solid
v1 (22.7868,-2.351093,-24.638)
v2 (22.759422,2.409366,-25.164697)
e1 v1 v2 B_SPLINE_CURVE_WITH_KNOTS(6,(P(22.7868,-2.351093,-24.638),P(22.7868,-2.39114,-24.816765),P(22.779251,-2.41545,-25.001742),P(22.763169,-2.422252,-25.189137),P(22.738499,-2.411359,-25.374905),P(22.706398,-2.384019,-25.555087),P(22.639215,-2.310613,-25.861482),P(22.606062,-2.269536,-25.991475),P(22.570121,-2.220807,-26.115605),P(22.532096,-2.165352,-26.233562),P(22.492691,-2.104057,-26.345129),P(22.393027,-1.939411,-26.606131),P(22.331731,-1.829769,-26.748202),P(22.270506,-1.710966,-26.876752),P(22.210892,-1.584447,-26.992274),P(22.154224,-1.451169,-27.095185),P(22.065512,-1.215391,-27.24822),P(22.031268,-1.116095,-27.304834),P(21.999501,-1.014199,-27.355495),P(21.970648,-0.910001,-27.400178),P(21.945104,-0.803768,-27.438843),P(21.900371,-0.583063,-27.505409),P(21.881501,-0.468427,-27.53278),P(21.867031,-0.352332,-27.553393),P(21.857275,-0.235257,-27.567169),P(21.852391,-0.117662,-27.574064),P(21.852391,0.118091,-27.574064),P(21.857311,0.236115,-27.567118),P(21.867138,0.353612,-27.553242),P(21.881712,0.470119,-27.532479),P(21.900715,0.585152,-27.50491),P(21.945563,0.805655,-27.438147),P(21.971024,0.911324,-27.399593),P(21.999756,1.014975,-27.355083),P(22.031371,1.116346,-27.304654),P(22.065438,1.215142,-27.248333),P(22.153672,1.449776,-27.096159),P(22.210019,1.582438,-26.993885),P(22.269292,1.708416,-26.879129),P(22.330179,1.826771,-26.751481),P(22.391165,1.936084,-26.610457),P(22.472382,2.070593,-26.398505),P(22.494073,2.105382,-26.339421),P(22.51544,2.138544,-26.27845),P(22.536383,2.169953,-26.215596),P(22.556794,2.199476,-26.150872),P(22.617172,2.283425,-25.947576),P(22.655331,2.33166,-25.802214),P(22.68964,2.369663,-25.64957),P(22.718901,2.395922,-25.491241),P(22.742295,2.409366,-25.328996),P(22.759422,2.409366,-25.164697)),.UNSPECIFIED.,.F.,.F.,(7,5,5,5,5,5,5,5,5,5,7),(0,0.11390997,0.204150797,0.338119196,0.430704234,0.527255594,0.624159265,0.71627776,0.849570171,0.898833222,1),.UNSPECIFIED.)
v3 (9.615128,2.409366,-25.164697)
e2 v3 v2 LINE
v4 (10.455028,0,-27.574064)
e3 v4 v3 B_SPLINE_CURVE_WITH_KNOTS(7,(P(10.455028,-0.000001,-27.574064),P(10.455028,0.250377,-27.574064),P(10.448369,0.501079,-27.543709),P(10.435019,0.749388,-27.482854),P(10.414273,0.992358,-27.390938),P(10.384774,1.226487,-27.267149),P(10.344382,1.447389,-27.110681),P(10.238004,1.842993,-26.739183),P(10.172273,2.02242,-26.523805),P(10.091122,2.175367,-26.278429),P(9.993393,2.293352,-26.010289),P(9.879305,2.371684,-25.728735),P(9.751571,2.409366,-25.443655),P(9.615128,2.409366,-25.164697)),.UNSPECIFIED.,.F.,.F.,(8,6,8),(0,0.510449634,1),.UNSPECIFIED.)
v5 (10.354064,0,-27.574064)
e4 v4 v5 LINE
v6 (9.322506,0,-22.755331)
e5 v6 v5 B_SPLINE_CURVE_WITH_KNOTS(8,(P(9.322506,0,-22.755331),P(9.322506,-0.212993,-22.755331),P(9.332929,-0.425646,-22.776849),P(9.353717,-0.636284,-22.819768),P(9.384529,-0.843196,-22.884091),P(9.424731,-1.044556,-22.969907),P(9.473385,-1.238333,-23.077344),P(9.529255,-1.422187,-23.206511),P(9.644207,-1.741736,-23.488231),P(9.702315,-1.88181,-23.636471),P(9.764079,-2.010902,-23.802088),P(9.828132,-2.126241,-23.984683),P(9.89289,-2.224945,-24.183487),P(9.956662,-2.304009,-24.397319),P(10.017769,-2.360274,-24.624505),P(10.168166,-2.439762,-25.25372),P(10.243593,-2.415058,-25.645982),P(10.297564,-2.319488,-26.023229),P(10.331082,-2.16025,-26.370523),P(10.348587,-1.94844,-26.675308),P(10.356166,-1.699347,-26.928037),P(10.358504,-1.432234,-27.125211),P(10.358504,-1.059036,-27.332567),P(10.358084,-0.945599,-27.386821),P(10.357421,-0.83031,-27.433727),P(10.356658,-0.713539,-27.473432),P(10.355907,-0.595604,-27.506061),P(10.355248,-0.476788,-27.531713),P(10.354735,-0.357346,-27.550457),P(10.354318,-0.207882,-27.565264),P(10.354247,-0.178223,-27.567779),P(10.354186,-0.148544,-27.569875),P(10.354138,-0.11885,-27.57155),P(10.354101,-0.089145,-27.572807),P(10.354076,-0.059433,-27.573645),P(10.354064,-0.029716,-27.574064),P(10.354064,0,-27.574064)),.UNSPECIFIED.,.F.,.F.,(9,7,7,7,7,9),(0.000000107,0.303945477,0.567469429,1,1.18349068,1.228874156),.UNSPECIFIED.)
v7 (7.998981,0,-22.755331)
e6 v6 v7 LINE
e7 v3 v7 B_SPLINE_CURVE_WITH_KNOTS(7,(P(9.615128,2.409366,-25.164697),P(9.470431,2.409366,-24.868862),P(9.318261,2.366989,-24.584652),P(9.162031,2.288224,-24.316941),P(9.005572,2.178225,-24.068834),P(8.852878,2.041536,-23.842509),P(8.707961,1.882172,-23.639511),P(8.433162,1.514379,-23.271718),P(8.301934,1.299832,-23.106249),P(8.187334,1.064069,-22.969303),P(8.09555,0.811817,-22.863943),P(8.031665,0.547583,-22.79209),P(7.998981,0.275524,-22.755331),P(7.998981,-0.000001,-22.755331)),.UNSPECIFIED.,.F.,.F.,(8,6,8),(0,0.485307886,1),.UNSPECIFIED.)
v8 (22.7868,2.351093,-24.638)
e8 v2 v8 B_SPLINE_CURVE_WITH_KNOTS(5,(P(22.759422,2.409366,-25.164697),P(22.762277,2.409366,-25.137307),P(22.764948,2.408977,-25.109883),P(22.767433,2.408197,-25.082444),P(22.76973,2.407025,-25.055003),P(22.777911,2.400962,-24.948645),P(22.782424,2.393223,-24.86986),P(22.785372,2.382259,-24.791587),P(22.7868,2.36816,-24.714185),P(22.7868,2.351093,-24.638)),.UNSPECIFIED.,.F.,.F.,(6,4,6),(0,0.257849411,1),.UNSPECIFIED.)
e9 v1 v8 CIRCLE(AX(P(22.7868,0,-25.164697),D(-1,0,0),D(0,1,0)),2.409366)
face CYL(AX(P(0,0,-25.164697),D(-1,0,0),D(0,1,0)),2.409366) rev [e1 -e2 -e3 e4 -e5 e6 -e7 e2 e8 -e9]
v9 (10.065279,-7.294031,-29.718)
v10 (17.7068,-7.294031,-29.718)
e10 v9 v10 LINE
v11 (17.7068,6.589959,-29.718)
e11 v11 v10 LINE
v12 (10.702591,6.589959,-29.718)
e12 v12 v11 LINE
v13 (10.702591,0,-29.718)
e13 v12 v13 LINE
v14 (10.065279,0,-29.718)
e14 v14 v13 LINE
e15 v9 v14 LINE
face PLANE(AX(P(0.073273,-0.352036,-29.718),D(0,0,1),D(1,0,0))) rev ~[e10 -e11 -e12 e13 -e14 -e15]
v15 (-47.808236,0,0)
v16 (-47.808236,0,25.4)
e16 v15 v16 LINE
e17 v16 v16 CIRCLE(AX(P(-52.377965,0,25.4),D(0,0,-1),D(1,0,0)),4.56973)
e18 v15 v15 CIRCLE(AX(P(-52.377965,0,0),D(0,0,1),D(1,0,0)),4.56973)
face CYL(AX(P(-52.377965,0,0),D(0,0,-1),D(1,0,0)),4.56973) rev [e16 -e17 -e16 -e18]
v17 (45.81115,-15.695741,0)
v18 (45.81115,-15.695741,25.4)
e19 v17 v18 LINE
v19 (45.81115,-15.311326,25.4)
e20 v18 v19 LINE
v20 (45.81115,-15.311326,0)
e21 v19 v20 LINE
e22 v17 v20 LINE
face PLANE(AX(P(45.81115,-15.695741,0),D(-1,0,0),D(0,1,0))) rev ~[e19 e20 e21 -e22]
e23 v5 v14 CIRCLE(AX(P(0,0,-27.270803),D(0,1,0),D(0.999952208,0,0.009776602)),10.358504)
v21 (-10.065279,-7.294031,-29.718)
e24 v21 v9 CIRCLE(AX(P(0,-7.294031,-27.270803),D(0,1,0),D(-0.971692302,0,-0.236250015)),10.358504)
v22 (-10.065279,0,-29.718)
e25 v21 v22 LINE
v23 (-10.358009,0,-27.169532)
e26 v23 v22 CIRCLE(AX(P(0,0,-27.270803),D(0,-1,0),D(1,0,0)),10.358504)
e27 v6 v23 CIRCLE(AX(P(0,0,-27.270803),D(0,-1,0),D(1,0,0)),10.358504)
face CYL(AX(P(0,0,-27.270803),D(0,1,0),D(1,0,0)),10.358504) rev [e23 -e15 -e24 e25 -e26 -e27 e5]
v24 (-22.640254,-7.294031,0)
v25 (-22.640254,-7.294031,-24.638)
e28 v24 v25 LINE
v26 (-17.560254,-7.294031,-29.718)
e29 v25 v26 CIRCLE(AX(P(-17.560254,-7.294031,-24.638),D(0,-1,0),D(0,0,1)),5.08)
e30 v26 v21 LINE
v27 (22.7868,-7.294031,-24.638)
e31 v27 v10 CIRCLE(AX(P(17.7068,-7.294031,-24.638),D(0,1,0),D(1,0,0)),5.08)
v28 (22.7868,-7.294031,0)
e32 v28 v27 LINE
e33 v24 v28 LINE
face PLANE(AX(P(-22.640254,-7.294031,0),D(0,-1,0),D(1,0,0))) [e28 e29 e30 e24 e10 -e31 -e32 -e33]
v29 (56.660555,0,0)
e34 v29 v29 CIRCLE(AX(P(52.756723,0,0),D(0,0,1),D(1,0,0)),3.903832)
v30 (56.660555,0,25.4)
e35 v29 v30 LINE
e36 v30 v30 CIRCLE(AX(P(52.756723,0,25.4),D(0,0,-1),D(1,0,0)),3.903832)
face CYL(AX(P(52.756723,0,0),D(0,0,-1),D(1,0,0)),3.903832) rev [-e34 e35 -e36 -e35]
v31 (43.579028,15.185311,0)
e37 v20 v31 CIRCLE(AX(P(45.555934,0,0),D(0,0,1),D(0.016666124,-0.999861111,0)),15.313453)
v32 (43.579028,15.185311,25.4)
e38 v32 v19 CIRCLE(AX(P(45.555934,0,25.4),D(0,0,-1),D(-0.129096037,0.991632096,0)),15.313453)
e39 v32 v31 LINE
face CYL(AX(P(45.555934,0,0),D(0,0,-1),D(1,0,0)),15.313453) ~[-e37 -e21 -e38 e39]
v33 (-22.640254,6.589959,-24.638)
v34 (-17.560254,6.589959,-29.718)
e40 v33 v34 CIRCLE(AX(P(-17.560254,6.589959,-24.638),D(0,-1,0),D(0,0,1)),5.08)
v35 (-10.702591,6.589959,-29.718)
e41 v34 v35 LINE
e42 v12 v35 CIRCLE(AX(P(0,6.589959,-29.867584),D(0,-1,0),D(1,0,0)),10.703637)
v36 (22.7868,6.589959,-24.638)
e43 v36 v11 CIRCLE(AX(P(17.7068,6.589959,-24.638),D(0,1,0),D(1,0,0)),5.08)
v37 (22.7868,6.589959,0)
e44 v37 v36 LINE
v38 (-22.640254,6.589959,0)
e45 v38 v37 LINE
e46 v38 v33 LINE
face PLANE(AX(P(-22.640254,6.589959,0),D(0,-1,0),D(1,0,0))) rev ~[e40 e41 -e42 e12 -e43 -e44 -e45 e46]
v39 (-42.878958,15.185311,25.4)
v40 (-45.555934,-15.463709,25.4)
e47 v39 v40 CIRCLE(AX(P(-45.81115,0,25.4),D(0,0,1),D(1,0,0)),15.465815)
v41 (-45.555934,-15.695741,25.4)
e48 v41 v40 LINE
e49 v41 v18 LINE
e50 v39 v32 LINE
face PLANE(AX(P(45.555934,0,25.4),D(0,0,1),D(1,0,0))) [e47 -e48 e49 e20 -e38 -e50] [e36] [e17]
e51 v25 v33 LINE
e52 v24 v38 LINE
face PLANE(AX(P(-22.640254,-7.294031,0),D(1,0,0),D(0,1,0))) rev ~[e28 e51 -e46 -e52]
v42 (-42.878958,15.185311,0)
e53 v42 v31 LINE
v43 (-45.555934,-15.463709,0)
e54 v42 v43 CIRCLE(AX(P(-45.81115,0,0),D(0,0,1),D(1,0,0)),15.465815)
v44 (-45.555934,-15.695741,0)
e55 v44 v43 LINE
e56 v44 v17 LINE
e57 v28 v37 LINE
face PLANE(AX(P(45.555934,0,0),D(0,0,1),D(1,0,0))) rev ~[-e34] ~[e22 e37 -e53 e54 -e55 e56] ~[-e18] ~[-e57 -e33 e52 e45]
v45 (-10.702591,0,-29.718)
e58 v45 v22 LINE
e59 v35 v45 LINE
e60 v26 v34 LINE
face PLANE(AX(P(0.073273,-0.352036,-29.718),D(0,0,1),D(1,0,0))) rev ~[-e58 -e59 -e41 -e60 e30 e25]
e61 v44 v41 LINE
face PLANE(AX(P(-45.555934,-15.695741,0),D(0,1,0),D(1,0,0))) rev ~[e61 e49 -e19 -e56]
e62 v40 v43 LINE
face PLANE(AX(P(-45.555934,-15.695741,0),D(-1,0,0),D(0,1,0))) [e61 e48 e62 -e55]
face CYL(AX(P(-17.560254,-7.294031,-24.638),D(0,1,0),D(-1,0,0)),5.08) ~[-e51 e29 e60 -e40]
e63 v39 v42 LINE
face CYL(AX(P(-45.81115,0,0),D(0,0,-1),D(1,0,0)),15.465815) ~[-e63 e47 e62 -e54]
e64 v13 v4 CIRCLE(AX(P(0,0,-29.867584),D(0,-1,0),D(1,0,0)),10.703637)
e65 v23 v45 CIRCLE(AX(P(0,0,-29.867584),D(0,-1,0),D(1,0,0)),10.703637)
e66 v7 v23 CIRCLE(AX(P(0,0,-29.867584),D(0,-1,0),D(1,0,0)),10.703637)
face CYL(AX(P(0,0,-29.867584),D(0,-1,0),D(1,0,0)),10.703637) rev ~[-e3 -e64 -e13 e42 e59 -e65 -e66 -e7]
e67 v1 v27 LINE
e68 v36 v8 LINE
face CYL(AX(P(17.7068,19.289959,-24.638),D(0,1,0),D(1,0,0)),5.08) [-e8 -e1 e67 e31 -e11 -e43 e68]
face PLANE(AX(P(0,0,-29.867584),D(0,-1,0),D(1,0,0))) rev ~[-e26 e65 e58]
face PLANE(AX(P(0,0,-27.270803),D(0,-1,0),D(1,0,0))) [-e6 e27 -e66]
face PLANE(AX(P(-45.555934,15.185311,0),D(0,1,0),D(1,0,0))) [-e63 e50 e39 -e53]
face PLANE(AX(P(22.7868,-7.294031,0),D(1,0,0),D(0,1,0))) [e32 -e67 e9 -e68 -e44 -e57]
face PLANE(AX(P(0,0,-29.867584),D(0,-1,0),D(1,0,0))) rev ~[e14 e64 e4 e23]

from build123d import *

# Parameters (mm, degrees)
F1_R         = 15.4658150948
F3_DEPTH     = 25.4
F0_W         = 91.367084533
F0_H         = 30.8810528368
F4_DEPTH     = 25.4
F2_R         = 15.313452945
F5_DEPTH     = 25.4
F6_R         = 3.9725855112
F7_DEPTH     = 25.4
F8_R         = 4.5697295071
F9_DEPTH     = 26.67
F10_R        = 3.9038322972
F11_DEPTH    = 30.988
F12_W        = 45.4270541668
F12_H        = 13.8839902356
F13_DEPTH    = 29.718
F15_R        = 10.7036365959
F16_DEPTH    = 25.4
F17_R        = 10.3585042146
F18_DEPTH    = 46.736
F14_R        = 2.4093664871
F19_DEPTH    = 44.196
F20_R        = 5.08
F21_T1_DEPTH = 39.2839902356


# Not quite as in the source:
# - a fillet or chamfer that OpenCascade refuses, or shapes differently, is made with other operations: its cross-section is extruded or revolved along the edge and cut away or added


with BuildPart() as f3:
    # F1 (on Top) → F3 (new body)
    with BuildSketch(Plane.XY):
        with Locations((-45.811150223, 0)):
            Circle(F1_R)
    extrude(amount=F3_DEPTH)

    # F0 (on Top) → F4 (join)
    with BuildSketch(Plane.XY):
        with Locations((0.1276079565, -0.2552149817)):
            Rectangle(F0_W, F0_H)
    extrude(amount=F4_DEPTH)

    # F2 (on Top) → F5 (join)
    with BuildSketch(Plane.XY):
        with Locations((45.55593431, 0)):
            Circle(F2_R)
    extrude(amount=F5_DEPTH)

    # F6 (on Top) → F7 (cut)
    with BuildSketch(Plane.XY):
        with Locations((-53.0294403434, 0)):
            Circle(F6_R)
    extrude(amount=-F7_DEPTH, mode=Mode.SUBTRACT)

    # F8 (on Top) → F9 (cut)
    with BuildSketch(Plane.XY):
        with Locations((-52.3779653013, 0)):
            Circle(F8_R)
    extrude(amount=F9_DEPTH, mode=Mode.SUBTRACT)

    # F10 (on Top) → F11 (cut)
    with BuildSketch(Plane.XY):
        with Locations((52.7567230165, 0)):
            Circle(F10_R)
    extrude(amount=F11_DEPTH, mode=Mode.SUBTRACT)

    # F12 (on Top) → F13 (join)
    with BuildSketch(Plane.XY):
        with Locations((0.0732727349, -0.3520357423)):
            Rectangle(F12_W, F12_H)
    extrude(amount=-F13_DEPTH)

    # F15 (on Front) → F16 (cut)
    with BuildSketch(Plane.XZ):
        with Locations((0, -29.8675838858)):
            Circle(F15_R)
    extrude(amount=-F16_DEPTH, mode=Mode.SUBTRACT)

    # F17 (on Front) → F18 (cut)
    with BuildSketch(Plane.XZ):
        with Locations((0, -27.270803228)):
            Circle(F17_R)
    extrude(amount=F18_DEPTH, mode=Mode.SUBTRACT)

    # F14 (on Right) → F19 (cut)
    with BuildSketch(Plane.YZ):
        with Locations((0, -25.1646973193)):
            Circle(F14_R)
    extrude(amount=F19_DEPTH, mode=Mode.SUBTRACT)

    # F20
    f20_edges = [f3.edges().sort_by_distance(p)[0] for p in [
        (-22.640254, -0.352036, -29.718),
    ]]
    fillet(f20_edges, radius=F20_R)

    # F21: fillet of radius 5.08 on 1 edges, made by hand

    # F21_s2 → F21_t1 (cut)
    with BuildSketch(Plane.XZ.offset(-19.2899593756)):
        with BuildLine():
            ThreePointArc((22.7867998183, -24.638), (21.2989022667, -28.2301024484), (17.7067998183, -29.718))
            Line((17.7067998183, -29.718), (22.7867998183, -29.718))
            Line((22.7867998183, -29.718), (22.7867998183, -24.638))
        make_face()
    extrude(amount=F21_T1_DEPTH, mode=Mode.SUBTRACT)


solid = f3.part
